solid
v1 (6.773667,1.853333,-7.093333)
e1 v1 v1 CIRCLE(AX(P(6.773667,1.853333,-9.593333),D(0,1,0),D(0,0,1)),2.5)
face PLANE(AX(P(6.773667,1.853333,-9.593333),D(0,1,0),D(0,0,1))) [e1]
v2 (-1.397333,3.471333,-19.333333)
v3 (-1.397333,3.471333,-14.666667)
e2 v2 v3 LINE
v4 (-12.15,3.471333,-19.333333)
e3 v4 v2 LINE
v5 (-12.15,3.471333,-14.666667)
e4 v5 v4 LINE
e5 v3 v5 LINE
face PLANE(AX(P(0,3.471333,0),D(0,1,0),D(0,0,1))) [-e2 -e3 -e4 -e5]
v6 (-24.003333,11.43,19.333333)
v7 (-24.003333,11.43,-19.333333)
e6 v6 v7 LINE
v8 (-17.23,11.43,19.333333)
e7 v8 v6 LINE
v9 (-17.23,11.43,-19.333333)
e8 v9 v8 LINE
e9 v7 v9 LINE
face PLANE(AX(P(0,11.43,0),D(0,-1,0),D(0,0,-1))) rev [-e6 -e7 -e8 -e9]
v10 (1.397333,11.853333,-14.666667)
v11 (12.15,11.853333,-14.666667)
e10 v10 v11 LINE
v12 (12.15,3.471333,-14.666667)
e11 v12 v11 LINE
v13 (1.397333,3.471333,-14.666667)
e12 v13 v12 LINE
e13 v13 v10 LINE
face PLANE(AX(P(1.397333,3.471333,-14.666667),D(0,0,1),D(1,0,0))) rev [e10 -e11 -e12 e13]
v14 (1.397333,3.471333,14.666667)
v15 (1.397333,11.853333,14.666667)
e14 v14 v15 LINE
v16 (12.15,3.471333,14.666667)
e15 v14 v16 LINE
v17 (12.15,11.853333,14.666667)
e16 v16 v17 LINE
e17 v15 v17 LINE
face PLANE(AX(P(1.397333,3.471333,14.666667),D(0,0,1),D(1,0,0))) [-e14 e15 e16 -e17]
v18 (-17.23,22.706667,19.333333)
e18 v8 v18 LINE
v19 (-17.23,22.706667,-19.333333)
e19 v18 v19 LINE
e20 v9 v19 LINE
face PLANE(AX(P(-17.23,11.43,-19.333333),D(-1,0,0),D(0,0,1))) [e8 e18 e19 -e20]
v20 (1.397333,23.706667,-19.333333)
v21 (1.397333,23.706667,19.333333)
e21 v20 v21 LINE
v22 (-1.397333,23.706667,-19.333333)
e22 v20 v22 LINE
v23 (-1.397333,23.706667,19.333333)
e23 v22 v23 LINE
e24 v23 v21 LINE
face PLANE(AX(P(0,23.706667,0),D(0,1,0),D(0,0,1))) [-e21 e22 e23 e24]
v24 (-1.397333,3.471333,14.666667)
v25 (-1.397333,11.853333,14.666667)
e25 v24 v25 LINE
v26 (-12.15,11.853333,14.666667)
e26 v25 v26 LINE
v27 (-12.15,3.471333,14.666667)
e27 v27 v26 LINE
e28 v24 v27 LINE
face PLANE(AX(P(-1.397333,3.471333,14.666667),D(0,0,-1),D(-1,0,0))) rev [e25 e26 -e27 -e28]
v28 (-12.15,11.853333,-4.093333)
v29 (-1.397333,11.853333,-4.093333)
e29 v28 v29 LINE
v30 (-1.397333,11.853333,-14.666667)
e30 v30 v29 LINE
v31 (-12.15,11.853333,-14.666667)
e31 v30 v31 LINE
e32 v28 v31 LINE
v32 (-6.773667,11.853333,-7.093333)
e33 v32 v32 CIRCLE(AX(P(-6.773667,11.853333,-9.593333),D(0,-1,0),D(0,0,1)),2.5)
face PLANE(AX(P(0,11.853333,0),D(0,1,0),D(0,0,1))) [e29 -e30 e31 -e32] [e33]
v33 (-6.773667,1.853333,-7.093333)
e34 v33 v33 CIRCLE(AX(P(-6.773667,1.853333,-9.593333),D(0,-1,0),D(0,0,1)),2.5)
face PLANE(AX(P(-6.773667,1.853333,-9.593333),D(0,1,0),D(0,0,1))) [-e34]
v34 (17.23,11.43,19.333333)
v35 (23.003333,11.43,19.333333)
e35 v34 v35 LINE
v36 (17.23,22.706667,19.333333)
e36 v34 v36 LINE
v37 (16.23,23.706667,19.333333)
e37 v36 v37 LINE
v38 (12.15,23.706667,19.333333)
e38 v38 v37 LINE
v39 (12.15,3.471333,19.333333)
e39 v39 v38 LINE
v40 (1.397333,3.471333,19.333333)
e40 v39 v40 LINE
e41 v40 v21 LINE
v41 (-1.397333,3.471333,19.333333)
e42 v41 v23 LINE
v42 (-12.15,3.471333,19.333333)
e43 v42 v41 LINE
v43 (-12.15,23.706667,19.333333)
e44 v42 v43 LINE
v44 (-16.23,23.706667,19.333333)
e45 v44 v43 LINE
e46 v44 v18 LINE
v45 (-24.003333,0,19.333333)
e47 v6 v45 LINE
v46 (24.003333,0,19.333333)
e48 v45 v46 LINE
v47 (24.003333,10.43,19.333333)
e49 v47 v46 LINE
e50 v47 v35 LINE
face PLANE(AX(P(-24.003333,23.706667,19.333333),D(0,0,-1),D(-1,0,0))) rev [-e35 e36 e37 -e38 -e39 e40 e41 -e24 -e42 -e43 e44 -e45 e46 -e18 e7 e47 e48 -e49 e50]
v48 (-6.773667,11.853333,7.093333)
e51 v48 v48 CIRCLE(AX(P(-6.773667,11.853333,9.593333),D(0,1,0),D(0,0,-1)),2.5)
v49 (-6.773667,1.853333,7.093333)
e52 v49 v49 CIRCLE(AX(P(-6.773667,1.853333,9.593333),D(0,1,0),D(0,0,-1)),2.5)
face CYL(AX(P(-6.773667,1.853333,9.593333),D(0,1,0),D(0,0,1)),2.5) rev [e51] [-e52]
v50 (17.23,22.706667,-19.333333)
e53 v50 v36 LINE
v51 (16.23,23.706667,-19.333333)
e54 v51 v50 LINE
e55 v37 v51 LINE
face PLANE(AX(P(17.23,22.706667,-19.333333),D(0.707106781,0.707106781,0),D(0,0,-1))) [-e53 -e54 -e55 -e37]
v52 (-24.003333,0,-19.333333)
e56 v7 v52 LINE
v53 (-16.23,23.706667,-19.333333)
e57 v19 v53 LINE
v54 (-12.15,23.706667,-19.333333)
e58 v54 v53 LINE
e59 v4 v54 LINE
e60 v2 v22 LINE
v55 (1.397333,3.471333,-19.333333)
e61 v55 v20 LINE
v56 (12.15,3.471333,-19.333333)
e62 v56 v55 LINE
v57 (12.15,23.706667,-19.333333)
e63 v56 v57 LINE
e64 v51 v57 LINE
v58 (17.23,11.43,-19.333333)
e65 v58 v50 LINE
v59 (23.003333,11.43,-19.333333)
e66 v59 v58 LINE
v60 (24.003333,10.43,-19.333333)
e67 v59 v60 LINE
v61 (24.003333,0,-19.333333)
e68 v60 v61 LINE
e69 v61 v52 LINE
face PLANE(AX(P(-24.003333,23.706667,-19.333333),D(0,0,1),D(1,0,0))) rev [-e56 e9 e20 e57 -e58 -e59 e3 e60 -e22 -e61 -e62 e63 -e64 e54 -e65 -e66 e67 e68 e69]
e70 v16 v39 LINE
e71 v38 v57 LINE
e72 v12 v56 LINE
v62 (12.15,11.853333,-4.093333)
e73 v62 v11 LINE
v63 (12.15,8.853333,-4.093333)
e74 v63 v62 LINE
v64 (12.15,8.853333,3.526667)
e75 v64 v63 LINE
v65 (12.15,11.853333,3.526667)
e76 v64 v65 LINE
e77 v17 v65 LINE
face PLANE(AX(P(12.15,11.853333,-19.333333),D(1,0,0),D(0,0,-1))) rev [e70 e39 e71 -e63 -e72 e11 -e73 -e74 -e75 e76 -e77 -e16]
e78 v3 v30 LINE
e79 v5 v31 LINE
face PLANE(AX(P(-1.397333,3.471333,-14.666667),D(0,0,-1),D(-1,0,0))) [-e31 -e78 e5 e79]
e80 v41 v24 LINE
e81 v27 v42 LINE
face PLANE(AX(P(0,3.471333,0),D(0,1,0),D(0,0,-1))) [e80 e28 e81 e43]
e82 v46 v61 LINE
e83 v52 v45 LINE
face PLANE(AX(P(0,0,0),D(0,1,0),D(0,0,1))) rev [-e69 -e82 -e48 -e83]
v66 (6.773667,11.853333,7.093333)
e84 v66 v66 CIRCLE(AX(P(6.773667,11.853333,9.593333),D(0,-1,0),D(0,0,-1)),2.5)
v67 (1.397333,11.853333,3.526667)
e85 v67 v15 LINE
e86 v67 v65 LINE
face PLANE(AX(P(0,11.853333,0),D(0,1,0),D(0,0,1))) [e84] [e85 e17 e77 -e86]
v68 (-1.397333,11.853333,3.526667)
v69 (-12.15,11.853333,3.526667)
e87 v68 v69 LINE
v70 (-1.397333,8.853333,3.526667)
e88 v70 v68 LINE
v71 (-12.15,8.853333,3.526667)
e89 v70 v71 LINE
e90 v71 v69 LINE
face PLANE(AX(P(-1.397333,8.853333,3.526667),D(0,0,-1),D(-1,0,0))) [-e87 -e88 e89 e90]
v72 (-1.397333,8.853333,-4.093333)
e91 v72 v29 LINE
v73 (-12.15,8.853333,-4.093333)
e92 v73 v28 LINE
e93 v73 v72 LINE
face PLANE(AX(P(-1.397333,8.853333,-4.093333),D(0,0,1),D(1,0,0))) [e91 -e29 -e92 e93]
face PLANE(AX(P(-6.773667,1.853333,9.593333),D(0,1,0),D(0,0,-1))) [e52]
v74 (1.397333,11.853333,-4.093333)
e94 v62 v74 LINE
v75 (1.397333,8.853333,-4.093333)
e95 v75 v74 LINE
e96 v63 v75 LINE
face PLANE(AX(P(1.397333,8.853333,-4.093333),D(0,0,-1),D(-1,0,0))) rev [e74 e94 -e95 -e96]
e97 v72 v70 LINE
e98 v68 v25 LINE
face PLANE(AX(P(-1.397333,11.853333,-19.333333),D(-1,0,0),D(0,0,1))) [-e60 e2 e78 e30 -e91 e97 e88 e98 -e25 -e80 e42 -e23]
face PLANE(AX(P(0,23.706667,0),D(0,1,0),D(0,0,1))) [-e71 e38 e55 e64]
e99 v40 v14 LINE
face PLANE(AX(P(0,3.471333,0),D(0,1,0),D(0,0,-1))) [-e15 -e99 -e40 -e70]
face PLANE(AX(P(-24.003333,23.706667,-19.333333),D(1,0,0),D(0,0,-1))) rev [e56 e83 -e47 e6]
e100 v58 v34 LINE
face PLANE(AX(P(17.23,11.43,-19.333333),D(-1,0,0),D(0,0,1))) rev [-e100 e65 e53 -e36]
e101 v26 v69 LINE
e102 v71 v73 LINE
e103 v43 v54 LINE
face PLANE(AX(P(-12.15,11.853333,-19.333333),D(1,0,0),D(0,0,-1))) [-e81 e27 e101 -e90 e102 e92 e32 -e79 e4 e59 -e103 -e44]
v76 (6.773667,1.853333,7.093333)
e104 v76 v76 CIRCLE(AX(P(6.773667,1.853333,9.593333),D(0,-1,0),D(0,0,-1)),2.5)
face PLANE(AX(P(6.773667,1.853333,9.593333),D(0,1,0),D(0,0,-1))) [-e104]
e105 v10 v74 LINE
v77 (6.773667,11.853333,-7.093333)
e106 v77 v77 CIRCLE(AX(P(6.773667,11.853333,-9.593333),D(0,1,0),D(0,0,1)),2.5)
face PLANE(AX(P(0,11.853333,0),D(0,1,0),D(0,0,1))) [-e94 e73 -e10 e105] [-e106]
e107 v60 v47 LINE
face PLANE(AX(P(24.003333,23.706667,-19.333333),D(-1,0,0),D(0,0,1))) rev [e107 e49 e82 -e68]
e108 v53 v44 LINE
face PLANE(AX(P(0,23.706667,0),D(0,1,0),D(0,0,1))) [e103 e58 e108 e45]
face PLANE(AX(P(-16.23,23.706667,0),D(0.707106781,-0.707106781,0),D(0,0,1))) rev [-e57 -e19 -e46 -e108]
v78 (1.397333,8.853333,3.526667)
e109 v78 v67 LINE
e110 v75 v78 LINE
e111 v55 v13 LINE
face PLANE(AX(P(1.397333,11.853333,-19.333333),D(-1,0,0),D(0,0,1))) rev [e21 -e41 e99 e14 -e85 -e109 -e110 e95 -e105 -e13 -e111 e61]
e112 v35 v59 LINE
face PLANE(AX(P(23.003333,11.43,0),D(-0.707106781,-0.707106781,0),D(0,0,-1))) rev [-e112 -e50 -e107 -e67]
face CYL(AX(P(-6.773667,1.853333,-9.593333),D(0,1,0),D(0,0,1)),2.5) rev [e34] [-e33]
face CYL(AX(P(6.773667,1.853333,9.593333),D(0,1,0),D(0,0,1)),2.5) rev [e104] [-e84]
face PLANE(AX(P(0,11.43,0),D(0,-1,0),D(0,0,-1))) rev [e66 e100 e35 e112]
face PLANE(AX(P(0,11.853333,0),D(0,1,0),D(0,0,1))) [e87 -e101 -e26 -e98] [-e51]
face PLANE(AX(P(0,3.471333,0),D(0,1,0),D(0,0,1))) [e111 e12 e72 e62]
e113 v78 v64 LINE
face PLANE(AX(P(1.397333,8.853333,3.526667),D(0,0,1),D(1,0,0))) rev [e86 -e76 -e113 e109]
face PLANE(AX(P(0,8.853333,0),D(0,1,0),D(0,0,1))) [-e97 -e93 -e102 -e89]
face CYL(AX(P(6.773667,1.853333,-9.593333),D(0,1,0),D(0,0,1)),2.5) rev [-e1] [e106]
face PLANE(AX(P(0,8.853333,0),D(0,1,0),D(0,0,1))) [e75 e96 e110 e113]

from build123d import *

# Parameters (mm, degrees)
EXTRUDE_1_DEPTH        = 23.706666667
SKETCH_2_W             = 6.773333333
SKETCH_2_H             = 38.666666667
CUT_EXTRUDE_1_DEPTH    = 12.276666667
CHAMFER_1_SIZE         = 1
SKETCH_3_W             = 10.752666667
SKETCH_3_H             = 38.666666667
CUT_EXTRUDE_2_DEPTH    = 11.853333333
SKETCH_4_W             = 10.752666667
SKETCH_4_H             = 4.666666667
CUT_EXTRUDE_3_DEPTH    = 8.382
SKETCH_5_R             = 2.5
CUT_EXTRUDE_4_DEPTH    = 10
SKETCH_6_W             = 10.752666667
SKETCH_6_H             = 7.62
CUT_EXTRUDE_5_DEPTH    = 3
MIRROR_START           = 11.853333334
MIRROR_2_OUTLINE_W     = 10.752666667
MIRROR_2_OUTLINE_H     = 38.666666667
MIRROR_2_DEPTH         = 11.853333333
MIRROR_START_2         = 3.471333334
MIRROR_2_2_OUTLINE_W   = 10.752666667
MIRROR_2_2_OUTLINE_H   = 4.666666667
MIRROR_2_2_OUTLINE_H_2 = 4.666666668
MIRROR_2_2_OUTLINE_R   = 2.5
MIRROR_2_2_DEPTH       = 8.382
MIRROR_START_3         = 8.853333334
MIRROR_2_3_OUTLINE_W   = 10.752666667
MIRROR_2_3_OUTLINE_H   = 7.62
MIRROR_2_3_DEPTH       = 3
MIRROR_START_4         = 1.853333334
MIRROR_2_4_OUTLINE_R   = 2.5
MIRROR_2_4_DEPTH       = 1.618
MIRROR_START_5         = -19.333333333
MIRROR_2_5_DEPTH       = 38.666666667


# Read off the part's stored shape, not the designer's step: ﾐﾗｰ2
with BuildPart() as part:
    # ｽｹｯﾁ1 → ﾎﾞｽ - 押し出し1 (new body)
    with BuildSketch(Plane(origin=(0, 0, 0), x_dir=(1, 0, 0), z_dir=(0, 1, 0))):
        Polygon((-24.003333333, 19.333333333), (24.003333334, 19.333333333), (24.003333333, -19.333333334), (-24.003333333, -19.333333334), align=None)
    extrude(amount=EXTRUDE_1_DEPTH)

    # ｽｹｯﾁ2 → ｶｯﾄ - 押し出し1 (cut)
    with BuildSketch(Plane(origin=(0, 23.706666667, 0), x_dir=(1, 0, 0), z_dir=(0, 1, 0))):
        with Locations((20.616666667, -1e-09)):
            Rectangle(SKETCH_2_W, SKETCH_2_H)
    extrude(amount=-CUT_EXTRUDE_1_DEPTH, mode=Mode.SUBTRACT)

    # 面取り1
    chamfer_1_edges = [part.edges().sort_by_distance(p)[0] for p in [
        (24.003333334, 11.43, 0),
        (17.230000001, 23.706666667, 0),
    ]]
    chamfer(chamfer_1_edges, length=CHAMFER_1_SIZE)

    # ｽｹｯﾁ3 → ｶｯﾄ - 押し出し2 (cut)
    with BuildSketch(Plane(origin=(0, 23.706666667, 0), x_dir=(1, 0, 0), z_dir=(0, 1, 0))):
        with Locations((6.773666668, -1e-09)):
            Rectangle(SKETCH_3_W, SKETCH_3_H)
    extrude(amount=-CUT_EXTRUDE_2_DEPTH, mode=Mode.SUBTRACT)

    # ｽｹｯﾁ4 → ｶｯﾄ - 押し出し3 (cut)
    with BuildSketch(Plane(origin=(0, 11.853333334, 0), x_dir=(1, 0, 0), z_dir=(0, 1, 0))):
        with Locations((6.773666668, 17)):
            Rectangle(SKETCH_4_W, SKETCH_4_H)
    cut_extrude_3 = extrude(amount=-CUT_EXTRUDE_3_DEPTH, mode=Mode.SUBTRACT)

    # ｽｹｯﾁ5 → ｶｯﾄ - 押し出し4 (cut)
    with BuildSketch(Plane(origin=(0, 11.853333334, 0), x_dir=(1, 0, 0), z_dir=(0, 1, 0))):
        with Locations(Location((6.773666667, 9.593333333, 0), (0, 0, 270))):
            Circle(SKETCH_5_R)
    cut_extrude_4 = extrude(amount=-CUT_EXTRUDE_4_DEPTH, mode=Mode.SUBTRACT)

    # ﾐﾗｰ1: ｶｯﾄ - 押し出し3, ｶｯﾄ - 押し出し4 across plane
    add(cut_extrude_3.mirror(Plane.XY), mode=Mode.SUBTRACT)
    add(cut_extrude_4.mirror(Plane.XY), mode=Mode.SUBTRACT)

    # ｽｹｯﾁ6 → ｶｯﾄ - 押し出し5 (cut)
    with BuildSketch(Plane(origin=(0, 11.853333334, 0), x_dir=(1, 0, 0), z_dir=(0, 1, 0))):
        with Locations((6.773666668, 0.283333333)):
            Rectangle(SKETCH_6_W, SKETCH_6_H)
    extrude(amount=-CUT_EXTRUDE_5_DEPTH, mode=Mode.SUBTRACT)

    # ﾐﾗｰ2 outline → ﾐﾗｰ2 (cut)
    with BuildSketch(Plane(origin=(0, 0, 0), x_dir=(1, 0, 0), z_dir=(0, 1, 0)).offset(MIRROR_START)):
        with Locations((-6.773666668, -1e-09)):
            Rectangle(MIRROR_2_OUTLINE_W, MIRROR_2_OUTLINE_H)
    extrude(amount=MIRROR_2_DEPTH, mode=Mode.SUBTRACT)

    # Mirror 2 2 outline → Mirror 2 2 (cut)
    with BuildSketch(Plane(origin=(0, 0, 0), x_dir=(1, 0, 0), z_dir=(0, 1, 0)).offset(MIRROR_START_2)):
        with Locations((-6.773666668, 17)):
            Rectangle(MIRROR_2_2_OUTLINE_W, MIRROR_2_2_OUTLINE_H)
        with Locations((-6.773666668, -17)):
            Rectangle(MIRROR_2_2_OUTLINE_W, MIRROR_2_2_OUTLINE_H_2)
        with Locations((-6.773666667, 9.593333333)):
            Circle(MIRROR_2_2_OUTLINE_R)
        with Locations((-6.773666667, -9.593333333)):
            Circle(MIRROR_2_2_OUTLINE_R)
    extrude(amount=MIRROR_2_2_DEPTH, mode=Mode.SUBTRACT)

    # Mirror 2 3 outline → Mirror 2 3 (cut)
    with BuildSketch(Plane(origin=(0, 0, 0), x_dir=(1, 0, 0), z_dir=(0, 1, 0)).offset(MIRROR_START_3)):
        with Locations((-6.773666668, 0.283333333)):
            Rectangle(MIRROR_2_3_OUTLINE_W, MIRROR_2_3_OUTLINE_H)
    extrude(amount=MIRROR_2_3_DEPTH, mode=Mode.SUBTRACT)

    # Mirror 2 4 outline → Mirror 2 4 (cut)
    with BuildSketch(Plane(origin=(0, 0, 0), x_dir=(1, 0, 0), z_dir=(0, 1, 0)).offset(MIRROR_START_4)):
        with Locations((-6.773666667, 9.593333333)):
            Circle(MIRROR_2_4_OUTLINE_R)
        with Locations((-6.773666667, -9.593333333)):
            Circle(MIRROR_2_4_OUTLINE_R)
    extrude(amount=MIRROR_2_4_DEPTH, mode=Mode.SUBTRACT)

    # Mirror 2 5 outline → Mirror 2 5 (cut)
    with BuildSketch(Plane.XY.offset(MIRROR_START_5)):
        Polygon((-24.003333333, 23.706666667), (-24.003333333, 11.43), (-17.230000001, 11.43), (-17.230000001, 22.706666667), (-16.230000001, 23.706666667), align=None)
    extrude(amount=MIRROR_2_5_DEPTH, mode=Mode.SUBTRACT)


solid = part.part
